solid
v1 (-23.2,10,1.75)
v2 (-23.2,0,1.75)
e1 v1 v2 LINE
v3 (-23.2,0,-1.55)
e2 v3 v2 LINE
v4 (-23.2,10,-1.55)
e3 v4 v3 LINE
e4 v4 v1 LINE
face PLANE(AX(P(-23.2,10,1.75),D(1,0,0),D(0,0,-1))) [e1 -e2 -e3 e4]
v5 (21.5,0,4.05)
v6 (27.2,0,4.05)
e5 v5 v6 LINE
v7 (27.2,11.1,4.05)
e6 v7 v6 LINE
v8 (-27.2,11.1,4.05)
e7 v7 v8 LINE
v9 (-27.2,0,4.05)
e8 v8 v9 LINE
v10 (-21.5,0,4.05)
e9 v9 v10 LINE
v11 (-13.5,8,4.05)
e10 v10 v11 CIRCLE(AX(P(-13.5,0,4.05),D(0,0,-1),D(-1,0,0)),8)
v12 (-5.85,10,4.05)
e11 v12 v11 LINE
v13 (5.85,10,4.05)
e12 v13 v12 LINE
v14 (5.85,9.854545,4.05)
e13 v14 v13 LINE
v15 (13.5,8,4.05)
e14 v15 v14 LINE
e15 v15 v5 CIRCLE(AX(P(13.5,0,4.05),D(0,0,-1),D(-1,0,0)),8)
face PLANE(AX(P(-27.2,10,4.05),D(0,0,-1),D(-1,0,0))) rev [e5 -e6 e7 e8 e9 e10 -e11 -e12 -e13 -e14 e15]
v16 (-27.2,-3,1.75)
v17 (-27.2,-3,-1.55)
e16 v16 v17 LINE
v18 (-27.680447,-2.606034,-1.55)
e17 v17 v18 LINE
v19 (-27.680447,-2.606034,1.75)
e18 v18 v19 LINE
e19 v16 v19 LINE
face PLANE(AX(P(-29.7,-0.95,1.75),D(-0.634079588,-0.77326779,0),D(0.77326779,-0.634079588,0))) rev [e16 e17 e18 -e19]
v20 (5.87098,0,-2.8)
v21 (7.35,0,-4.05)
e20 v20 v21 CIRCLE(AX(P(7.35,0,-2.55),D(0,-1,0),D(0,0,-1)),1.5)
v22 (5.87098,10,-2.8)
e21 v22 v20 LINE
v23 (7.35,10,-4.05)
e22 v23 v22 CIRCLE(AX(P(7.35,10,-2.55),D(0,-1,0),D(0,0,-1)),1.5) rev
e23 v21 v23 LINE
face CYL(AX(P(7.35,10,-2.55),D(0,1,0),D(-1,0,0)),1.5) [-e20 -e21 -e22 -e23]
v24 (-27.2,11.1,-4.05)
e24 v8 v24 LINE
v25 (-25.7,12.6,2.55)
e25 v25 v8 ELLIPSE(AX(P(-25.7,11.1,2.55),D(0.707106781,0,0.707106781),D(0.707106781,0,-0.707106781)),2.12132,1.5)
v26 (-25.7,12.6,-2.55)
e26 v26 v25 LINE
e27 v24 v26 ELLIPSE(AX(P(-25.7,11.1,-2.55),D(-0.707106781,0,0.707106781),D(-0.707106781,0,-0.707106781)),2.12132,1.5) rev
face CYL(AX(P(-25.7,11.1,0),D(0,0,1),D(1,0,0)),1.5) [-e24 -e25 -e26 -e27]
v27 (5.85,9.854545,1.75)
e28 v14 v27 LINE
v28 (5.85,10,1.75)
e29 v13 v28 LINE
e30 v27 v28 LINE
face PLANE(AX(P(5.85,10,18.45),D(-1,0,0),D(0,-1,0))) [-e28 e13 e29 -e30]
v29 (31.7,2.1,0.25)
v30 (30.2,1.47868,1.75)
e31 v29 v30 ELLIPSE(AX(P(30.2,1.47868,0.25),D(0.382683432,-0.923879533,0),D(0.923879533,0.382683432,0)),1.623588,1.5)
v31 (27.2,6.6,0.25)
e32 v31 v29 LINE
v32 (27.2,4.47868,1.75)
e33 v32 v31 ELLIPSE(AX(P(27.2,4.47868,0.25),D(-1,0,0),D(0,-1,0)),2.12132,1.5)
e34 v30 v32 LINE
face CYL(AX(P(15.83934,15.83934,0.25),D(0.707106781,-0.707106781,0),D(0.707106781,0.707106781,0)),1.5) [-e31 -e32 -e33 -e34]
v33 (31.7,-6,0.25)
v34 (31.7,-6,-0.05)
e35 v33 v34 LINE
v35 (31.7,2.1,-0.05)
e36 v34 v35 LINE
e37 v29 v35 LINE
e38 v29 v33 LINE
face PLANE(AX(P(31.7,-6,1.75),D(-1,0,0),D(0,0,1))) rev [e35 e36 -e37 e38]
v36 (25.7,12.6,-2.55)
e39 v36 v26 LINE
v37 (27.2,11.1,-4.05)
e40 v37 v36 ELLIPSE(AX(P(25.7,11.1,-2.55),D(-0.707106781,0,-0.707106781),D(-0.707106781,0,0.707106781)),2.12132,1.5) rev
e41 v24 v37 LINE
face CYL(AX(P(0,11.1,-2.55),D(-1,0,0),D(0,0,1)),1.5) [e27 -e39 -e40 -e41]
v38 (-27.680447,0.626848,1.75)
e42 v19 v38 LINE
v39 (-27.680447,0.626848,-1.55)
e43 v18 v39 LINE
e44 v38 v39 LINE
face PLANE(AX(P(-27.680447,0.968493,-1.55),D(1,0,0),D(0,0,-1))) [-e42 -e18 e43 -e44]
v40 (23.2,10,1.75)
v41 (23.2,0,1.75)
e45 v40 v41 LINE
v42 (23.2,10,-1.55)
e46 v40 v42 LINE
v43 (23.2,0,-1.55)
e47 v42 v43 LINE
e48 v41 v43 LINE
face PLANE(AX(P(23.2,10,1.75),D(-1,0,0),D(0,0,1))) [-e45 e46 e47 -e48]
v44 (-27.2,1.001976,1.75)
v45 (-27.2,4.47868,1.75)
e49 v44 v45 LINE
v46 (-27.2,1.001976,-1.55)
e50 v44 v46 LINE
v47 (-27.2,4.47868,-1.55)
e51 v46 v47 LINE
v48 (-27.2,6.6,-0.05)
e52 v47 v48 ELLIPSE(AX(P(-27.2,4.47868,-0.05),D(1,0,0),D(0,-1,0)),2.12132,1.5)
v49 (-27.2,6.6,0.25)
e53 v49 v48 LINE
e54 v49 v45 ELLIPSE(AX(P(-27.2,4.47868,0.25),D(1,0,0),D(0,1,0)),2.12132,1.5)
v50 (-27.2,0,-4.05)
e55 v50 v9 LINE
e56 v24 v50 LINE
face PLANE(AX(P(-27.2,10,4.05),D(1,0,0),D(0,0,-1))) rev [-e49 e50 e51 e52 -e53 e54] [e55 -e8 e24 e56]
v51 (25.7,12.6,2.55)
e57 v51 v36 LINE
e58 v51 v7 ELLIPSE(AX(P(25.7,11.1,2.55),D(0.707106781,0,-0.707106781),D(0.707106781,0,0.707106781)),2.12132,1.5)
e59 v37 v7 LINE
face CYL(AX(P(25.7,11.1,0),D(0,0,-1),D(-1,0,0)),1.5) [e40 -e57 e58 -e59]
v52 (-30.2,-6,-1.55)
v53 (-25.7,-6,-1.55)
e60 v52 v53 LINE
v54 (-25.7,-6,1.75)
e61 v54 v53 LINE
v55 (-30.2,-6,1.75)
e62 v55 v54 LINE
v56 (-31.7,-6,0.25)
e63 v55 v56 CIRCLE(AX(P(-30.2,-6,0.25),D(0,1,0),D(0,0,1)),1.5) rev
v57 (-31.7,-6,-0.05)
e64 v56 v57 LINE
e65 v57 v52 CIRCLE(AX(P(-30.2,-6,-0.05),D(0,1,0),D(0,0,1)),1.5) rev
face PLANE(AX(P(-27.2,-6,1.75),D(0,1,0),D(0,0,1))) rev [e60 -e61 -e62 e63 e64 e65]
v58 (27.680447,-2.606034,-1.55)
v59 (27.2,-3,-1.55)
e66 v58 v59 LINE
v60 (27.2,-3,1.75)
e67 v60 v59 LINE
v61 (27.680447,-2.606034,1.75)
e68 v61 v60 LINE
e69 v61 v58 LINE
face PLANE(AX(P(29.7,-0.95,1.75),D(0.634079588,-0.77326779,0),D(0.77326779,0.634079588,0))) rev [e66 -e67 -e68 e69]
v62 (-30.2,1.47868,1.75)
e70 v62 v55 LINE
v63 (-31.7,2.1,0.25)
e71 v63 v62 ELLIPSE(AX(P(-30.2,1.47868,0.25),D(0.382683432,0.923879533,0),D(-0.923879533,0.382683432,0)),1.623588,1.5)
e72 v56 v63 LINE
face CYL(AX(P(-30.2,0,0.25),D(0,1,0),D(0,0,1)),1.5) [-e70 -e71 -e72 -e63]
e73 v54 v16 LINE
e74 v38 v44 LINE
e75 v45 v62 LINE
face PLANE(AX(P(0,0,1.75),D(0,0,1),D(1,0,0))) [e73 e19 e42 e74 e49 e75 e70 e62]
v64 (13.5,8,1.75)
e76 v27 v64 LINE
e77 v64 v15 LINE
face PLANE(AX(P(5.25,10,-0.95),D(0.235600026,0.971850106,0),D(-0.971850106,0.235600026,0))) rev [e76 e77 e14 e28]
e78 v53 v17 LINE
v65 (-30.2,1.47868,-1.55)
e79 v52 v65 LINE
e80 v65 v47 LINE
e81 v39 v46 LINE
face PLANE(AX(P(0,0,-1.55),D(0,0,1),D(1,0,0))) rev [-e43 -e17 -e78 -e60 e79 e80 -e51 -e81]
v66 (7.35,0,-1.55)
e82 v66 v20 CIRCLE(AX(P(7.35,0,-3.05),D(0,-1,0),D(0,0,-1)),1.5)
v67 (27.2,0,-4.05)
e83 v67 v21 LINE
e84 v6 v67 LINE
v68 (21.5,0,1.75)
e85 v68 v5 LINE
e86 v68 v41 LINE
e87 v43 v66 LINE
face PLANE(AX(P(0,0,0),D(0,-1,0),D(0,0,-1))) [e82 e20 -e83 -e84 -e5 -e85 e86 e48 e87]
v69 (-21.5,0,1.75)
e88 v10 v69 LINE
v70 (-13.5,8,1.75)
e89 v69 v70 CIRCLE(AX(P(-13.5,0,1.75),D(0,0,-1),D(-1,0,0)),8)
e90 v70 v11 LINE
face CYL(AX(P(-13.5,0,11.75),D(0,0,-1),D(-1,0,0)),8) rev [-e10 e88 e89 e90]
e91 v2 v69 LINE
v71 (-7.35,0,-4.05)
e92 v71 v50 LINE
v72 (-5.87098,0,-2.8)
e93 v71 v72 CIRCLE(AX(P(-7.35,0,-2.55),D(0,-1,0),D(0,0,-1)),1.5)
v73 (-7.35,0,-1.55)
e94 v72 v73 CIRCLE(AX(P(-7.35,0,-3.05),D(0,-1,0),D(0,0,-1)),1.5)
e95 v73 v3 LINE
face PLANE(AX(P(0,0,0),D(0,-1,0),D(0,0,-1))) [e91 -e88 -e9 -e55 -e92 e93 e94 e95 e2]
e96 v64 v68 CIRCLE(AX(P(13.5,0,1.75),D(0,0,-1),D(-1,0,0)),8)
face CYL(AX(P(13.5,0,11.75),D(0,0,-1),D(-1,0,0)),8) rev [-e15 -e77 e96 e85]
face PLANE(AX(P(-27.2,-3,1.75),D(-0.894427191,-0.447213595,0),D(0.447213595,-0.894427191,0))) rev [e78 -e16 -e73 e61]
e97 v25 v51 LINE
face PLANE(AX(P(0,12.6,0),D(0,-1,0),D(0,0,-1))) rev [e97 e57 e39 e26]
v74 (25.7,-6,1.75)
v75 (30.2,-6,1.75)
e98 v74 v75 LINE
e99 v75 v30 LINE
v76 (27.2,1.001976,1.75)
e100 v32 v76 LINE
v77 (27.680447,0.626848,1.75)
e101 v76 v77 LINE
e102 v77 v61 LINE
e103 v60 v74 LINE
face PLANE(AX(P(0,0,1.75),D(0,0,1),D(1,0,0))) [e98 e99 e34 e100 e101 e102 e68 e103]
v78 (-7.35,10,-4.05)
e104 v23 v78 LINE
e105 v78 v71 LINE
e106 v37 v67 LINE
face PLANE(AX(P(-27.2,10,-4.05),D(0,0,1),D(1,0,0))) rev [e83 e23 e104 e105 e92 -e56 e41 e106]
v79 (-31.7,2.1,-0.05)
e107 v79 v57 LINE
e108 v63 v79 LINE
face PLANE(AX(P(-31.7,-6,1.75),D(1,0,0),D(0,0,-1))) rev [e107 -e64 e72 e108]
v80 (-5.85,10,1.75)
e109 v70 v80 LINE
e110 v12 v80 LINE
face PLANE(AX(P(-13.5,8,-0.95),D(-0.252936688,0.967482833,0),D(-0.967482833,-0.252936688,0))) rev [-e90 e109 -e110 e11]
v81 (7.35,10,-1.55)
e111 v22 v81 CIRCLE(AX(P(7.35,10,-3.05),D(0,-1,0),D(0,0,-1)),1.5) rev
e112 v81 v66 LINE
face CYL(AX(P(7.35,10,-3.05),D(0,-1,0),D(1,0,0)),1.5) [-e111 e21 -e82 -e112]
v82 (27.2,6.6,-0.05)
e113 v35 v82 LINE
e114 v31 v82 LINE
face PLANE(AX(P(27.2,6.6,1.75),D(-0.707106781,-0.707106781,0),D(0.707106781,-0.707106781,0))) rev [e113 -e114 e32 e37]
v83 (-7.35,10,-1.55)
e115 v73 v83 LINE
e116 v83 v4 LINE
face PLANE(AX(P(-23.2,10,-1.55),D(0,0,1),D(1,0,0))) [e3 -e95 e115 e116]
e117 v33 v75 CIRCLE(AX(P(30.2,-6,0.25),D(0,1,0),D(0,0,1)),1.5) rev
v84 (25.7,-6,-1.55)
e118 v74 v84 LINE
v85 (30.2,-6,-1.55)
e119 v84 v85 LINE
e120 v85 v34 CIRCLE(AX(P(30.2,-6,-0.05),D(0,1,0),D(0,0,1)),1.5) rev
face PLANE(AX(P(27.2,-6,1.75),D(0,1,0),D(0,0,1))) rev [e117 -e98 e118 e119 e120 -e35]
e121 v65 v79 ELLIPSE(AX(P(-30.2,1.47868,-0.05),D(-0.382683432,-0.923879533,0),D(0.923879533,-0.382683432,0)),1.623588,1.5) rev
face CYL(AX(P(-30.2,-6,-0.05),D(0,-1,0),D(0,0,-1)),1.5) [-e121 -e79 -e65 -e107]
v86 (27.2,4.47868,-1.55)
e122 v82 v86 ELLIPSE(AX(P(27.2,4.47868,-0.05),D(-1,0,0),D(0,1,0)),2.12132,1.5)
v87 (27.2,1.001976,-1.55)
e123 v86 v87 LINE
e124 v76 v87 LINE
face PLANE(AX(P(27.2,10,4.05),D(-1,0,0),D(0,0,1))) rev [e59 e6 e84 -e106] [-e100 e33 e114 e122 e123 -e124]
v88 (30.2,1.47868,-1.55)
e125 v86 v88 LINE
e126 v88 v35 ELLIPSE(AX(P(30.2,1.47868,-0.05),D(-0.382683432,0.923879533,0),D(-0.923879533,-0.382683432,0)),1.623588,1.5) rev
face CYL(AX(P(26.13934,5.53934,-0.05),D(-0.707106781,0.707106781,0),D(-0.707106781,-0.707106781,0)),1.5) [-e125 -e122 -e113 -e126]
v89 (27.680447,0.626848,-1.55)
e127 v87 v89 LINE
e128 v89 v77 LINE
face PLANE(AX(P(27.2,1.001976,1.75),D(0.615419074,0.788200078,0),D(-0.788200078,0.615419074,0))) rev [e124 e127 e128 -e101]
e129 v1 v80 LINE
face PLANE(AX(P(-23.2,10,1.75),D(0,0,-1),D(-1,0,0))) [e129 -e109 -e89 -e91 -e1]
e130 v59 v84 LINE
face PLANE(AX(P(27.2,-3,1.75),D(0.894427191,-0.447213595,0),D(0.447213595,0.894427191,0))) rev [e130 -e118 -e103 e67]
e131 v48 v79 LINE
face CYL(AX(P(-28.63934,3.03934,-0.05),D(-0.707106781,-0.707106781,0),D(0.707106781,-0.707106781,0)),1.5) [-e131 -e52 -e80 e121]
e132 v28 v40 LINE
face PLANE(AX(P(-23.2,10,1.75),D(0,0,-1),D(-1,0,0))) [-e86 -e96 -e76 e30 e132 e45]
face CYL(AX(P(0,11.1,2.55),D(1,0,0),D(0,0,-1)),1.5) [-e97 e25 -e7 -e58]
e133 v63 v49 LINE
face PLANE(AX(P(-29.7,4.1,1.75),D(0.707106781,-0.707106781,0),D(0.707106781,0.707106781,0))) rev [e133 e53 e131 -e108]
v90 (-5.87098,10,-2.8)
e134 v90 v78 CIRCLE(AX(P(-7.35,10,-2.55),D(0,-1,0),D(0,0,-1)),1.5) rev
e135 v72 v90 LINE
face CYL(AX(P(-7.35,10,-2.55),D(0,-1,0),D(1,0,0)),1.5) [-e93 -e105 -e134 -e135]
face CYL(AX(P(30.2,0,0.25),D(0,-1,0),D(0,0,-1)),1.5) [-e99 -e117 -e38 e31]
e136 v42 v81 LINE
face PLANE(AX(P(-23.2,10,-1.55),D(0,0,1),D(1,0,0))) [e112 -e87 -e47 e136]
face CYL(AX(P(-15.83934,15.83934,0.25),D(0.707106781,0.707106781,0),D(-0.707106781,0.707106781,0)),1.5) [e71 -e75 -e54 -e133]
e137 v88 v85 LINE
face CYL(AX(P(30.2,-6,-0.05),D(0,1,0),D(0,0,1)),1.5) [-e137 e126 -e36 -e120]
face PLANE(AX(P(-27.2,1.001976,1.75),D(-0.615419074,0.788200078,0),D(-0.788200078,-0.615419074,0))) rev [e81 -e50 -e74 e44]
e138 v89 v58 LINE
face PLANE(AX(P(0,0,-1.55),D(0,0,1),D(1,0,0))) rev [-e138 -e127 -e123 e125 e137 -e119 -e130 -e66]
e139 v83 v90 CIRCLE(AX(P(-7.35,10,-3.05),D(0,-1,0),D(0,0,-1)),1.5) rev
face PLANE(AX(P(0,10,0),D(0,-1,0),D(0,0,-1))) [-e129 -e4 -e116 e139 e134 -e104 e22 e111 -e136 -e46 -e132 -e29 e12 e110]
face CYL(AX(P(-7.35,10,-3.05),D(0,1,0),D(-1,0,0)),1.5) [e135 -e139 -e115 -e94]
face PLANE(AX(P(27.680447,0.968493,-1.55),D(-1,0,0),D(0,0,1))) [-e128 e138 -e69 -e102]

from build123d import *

# Parameters (mm, degrees)
SKETCH1_W           = 54.4
SKETCH1_H           = 8.1
SKETCH1_W_2         = 46.4
SKETCH1_H_2         = 3.3
BOSS_EXTRUDE1_DEPTH = 10
SKETCH2_W           = 11.7
SKETCH2_H           = 20
CUT_EXTRUDE1_DEPTH  = 10
SKETCH3_R           = 8
CUT_EXTRUDE2_DEPTH  = 10
SKETCH4_W           = 54.4
SKETCH4_H           = 8.1
BOSS_EXTRUDE2_DEPTH = 2.6
BOSS_EXTRUDE3_DEPTH = 3.3
SKETCH2_2_W         = 11.7
SKETCH2_2_H         = 20
CUT_EXTRUDE3_DEPTH  = 20
CUT_EXTRUDE4_START  = -5
CUT_EXTRUDE4_DEPTH  = 5
SKETCH7_W           = 2.777966001
SKETCH7_H           = 4.960653573
BOSS_EXTRUDE4_DEPTH = 3.3
FILLET1_R           = 1.5
FILLET2_R           = 1.5
FILLET3_R           = 1.5
FILLET4_R           = 1.5


with BuildPart() as part:
    # Sketch1 → Boss-Extrude1 (new body)
    with BuildSketch(Plane(origin=(0, 0, 0), x_dir=(1, 0, 0), z_dir=(0, 1, 0))):
        Rectangle(SKETCH1_W, SKETCH1_H)
        with Locations((0, -0.1)):
            Rectangle(SKETCH1_W_2, SKETCH1_H_2, mode=Mode.SUBTRACT)
    extrude(amount=BOSS_EXTRUDE1_DEPTH)

    # Sketch2 → Cut-Extrude1 (cut)
    with BuildSketch(Plane.XY.offset(-1.55)):
        Rectangle(SKETCH2_W, SKETCH2_H)
    extrude(amount=-CUT_EXTRUDE1_DEPTH, mode=Mode.SUBTRACT)

    # Sketch3 → Cut-Extrude2 (cut)
    with BuildSketch(Plane(origin=(0, 0, 1.75), x_dir=(-1, 0, 0), z_dir=(0, 0, -1))):
        with Locations((-13.5, 0)):
            Circle(SKETCH3_R)
        with Locations((13.5, 0)):
            Circle(SKETCH3_R)
    extrude(amount=-CUT_EXTRUDE2_DEPTH, mode=Mode.SUBTRACT)

    # Sketch4 → Boss-Extrude2 (add)
    with BuildSketch(Plane(origin=(0, 10, 0), x_dir=(1, 0, 0), z_dir=(0, 1, 0))):
        Rectangle(SKETCH4_W, SKETCH4_H)
    extrude(amount=BOSS_EXTRUDE2_DEPTH)

    # Sketch5 → Boss-Extrude3 (add)
    with BuildSketch(Plane.XY.offset(-1.55)):
        Polygon((27.2, -6), (25.7, -6), (27.2, -3), (29.7, -0.95), (27.2, 1.001976063), (27.2, 6.6), (29.7, 4.1), (31.7, 2.1), (31.7, -6), (29.7, -6), align=None)
        Polygon((-27.2, 6.6), (-27.2, 1.001976063), (-29.7, -0.95), (-27.2, -3), (-25.7, -6), (-27.2, -6), (-29.7, -6), (-31.7, -6), (-31.7, 2.1), (-29.7, 4.1), align=None)
    extrude(amount=BOSS_EXTRUDE3_DEPTH)

    # Sketch2<2> → Cut-Extrude3 (cut)
    with BuildSketch(Plane.XY.offset(-1.55)):
        Rectangle(SKETCH2_2_W, SKETCH2_2_H)
    extrude(amount=CUT_EXTRUDE3_DEPTH, mode=Mode.SUBTRACT)

    # Sketch6 → Cut-Extrude4 (cut)
    with BuildSketch(Plane.XY.offset(4.05).offset(CUT_EXTRUDE4_START)):
        with BuildLine():
            Line((-13.5, 8), (-5.85, 10))
            Line((-5.85, 10), (5.25, 10))
            Line((5.25, 10), (13.5, 8))
            ThreePointArc((13.5, 8), (21.5, 0), (13.5, -8))
            Line((13.5, -8), (-13.5, -8))
            ThreePointArc((-13.5, -8), (-21.5, 0), (-13.5, 8))
        make_face()
    extrude(amount=CUT_EXTRUDE4_DEPTH, mode=Mode.SUBTRACT)

    # Sketch7 → Boss-Extrude4 (add)
    with BuildSketch(Plane.XY.offset(1.75)):
        with Locations((-29.069429935, -1.511833966)):
            Rectangle(SKETCH7_W, SKETCH7_H)
        with Locations((29.069429935, -1.511833966)):
            Rectangle(SKETCH7_W, SKETCH7_H)
    extrude(amount=-BOSS_EXTRUDE4_DEPTH)

    # Fillet1
    fillet1_edges = [part.edges().sort_by_distance(p)[0] for p in [
        (-27.2, 12.6, 0),
        (0, 12.6, 4.05),
        (27.2, 12.6, 0),
        (0, 12.6, -4.05),
    ]]
    fillet(fillet1_edges, radius=FILLET1_R)

    # Fillet2
    # the kernel refuses this fillet: 1.5 mm, written as the material it takes off along each edge
    with BuildSketch(Plane(origin=(5.85, 10, -1.55), x_dir=(1, 0, 0), z_dir=(0, -1, 0))) as fillet2_piece_1:
        with BuildLine():
            CenterArc((FILLET2_R, -FILLET2_R), FILLET2_R, 90, 90)
            Line((0, -FILLET2_R), (0, 0))
            Line((0, 0), (FILLET2_R, 0))
        make_face()
    extrude(amount=13.75, mode=Mode.SUBTRACT)
    with BuildSketch(Plane(origin=(5.85, 10, -4.05), x_dir=(1, 0, 0), z_dir=(0, -1, 0))) as fillet2_piece_2:
        with BuildLine():
            CenterArc((FILLET2_R, FILLET2_R), FILLET2_R, 180, 90)
            Line((0, FILLET2_R), (0, 0))
            Line((0, 0), (FILLET2_R, 0))
        make_face()
    extrude(amount=13.75, mode=Mode.SUBTRACT)

    # Fillet3
    # the kernel refuses this fillet: 1.5 mm, written as the material it takes off along each edge
    with BuildSketch(Plane(origin=(-5.85, -3.75, -1.55), x_dir=(0, 0, -1), z_dir=(0, 1, 0)), Plane(origin=(-5.85, -3.75, -4.05), x_dir=(-1, 0, 0), z_dir=(0, 1, 0))) as fillet3_piece_1:
        with BuildLine():
            CenterArc((FILLET3_R, FILLET3_R), FILLET3_R, 180, 90)
            Line((0, FILLET3_R), (0, 0))
            Line((0, 0), (FILLET3_R, 0))
        make_face()
    extrude(amount=13.75, mode=Mode.SUBTRACT)

    # Fillet4
    fillet4_edges = [part.edges().sort_by_distance(p)[0] for p in [
        (31.7, -1.95, -1.55),
        (29.45, 4.35, -1.55),
        (31.7, -1.95, 1.75),
        (29.45, 4.35, 1.75),
        (-29.45, 4.35, -1.55),
        (-31.7, -1.95, -1.55),
        (-29.45, 4.35, 1.75),
        (-31.7, -1.95, 1.75),
    ]]
    fillet(fillet4_edges, radius=FILLET4_R)


solid = part.part
